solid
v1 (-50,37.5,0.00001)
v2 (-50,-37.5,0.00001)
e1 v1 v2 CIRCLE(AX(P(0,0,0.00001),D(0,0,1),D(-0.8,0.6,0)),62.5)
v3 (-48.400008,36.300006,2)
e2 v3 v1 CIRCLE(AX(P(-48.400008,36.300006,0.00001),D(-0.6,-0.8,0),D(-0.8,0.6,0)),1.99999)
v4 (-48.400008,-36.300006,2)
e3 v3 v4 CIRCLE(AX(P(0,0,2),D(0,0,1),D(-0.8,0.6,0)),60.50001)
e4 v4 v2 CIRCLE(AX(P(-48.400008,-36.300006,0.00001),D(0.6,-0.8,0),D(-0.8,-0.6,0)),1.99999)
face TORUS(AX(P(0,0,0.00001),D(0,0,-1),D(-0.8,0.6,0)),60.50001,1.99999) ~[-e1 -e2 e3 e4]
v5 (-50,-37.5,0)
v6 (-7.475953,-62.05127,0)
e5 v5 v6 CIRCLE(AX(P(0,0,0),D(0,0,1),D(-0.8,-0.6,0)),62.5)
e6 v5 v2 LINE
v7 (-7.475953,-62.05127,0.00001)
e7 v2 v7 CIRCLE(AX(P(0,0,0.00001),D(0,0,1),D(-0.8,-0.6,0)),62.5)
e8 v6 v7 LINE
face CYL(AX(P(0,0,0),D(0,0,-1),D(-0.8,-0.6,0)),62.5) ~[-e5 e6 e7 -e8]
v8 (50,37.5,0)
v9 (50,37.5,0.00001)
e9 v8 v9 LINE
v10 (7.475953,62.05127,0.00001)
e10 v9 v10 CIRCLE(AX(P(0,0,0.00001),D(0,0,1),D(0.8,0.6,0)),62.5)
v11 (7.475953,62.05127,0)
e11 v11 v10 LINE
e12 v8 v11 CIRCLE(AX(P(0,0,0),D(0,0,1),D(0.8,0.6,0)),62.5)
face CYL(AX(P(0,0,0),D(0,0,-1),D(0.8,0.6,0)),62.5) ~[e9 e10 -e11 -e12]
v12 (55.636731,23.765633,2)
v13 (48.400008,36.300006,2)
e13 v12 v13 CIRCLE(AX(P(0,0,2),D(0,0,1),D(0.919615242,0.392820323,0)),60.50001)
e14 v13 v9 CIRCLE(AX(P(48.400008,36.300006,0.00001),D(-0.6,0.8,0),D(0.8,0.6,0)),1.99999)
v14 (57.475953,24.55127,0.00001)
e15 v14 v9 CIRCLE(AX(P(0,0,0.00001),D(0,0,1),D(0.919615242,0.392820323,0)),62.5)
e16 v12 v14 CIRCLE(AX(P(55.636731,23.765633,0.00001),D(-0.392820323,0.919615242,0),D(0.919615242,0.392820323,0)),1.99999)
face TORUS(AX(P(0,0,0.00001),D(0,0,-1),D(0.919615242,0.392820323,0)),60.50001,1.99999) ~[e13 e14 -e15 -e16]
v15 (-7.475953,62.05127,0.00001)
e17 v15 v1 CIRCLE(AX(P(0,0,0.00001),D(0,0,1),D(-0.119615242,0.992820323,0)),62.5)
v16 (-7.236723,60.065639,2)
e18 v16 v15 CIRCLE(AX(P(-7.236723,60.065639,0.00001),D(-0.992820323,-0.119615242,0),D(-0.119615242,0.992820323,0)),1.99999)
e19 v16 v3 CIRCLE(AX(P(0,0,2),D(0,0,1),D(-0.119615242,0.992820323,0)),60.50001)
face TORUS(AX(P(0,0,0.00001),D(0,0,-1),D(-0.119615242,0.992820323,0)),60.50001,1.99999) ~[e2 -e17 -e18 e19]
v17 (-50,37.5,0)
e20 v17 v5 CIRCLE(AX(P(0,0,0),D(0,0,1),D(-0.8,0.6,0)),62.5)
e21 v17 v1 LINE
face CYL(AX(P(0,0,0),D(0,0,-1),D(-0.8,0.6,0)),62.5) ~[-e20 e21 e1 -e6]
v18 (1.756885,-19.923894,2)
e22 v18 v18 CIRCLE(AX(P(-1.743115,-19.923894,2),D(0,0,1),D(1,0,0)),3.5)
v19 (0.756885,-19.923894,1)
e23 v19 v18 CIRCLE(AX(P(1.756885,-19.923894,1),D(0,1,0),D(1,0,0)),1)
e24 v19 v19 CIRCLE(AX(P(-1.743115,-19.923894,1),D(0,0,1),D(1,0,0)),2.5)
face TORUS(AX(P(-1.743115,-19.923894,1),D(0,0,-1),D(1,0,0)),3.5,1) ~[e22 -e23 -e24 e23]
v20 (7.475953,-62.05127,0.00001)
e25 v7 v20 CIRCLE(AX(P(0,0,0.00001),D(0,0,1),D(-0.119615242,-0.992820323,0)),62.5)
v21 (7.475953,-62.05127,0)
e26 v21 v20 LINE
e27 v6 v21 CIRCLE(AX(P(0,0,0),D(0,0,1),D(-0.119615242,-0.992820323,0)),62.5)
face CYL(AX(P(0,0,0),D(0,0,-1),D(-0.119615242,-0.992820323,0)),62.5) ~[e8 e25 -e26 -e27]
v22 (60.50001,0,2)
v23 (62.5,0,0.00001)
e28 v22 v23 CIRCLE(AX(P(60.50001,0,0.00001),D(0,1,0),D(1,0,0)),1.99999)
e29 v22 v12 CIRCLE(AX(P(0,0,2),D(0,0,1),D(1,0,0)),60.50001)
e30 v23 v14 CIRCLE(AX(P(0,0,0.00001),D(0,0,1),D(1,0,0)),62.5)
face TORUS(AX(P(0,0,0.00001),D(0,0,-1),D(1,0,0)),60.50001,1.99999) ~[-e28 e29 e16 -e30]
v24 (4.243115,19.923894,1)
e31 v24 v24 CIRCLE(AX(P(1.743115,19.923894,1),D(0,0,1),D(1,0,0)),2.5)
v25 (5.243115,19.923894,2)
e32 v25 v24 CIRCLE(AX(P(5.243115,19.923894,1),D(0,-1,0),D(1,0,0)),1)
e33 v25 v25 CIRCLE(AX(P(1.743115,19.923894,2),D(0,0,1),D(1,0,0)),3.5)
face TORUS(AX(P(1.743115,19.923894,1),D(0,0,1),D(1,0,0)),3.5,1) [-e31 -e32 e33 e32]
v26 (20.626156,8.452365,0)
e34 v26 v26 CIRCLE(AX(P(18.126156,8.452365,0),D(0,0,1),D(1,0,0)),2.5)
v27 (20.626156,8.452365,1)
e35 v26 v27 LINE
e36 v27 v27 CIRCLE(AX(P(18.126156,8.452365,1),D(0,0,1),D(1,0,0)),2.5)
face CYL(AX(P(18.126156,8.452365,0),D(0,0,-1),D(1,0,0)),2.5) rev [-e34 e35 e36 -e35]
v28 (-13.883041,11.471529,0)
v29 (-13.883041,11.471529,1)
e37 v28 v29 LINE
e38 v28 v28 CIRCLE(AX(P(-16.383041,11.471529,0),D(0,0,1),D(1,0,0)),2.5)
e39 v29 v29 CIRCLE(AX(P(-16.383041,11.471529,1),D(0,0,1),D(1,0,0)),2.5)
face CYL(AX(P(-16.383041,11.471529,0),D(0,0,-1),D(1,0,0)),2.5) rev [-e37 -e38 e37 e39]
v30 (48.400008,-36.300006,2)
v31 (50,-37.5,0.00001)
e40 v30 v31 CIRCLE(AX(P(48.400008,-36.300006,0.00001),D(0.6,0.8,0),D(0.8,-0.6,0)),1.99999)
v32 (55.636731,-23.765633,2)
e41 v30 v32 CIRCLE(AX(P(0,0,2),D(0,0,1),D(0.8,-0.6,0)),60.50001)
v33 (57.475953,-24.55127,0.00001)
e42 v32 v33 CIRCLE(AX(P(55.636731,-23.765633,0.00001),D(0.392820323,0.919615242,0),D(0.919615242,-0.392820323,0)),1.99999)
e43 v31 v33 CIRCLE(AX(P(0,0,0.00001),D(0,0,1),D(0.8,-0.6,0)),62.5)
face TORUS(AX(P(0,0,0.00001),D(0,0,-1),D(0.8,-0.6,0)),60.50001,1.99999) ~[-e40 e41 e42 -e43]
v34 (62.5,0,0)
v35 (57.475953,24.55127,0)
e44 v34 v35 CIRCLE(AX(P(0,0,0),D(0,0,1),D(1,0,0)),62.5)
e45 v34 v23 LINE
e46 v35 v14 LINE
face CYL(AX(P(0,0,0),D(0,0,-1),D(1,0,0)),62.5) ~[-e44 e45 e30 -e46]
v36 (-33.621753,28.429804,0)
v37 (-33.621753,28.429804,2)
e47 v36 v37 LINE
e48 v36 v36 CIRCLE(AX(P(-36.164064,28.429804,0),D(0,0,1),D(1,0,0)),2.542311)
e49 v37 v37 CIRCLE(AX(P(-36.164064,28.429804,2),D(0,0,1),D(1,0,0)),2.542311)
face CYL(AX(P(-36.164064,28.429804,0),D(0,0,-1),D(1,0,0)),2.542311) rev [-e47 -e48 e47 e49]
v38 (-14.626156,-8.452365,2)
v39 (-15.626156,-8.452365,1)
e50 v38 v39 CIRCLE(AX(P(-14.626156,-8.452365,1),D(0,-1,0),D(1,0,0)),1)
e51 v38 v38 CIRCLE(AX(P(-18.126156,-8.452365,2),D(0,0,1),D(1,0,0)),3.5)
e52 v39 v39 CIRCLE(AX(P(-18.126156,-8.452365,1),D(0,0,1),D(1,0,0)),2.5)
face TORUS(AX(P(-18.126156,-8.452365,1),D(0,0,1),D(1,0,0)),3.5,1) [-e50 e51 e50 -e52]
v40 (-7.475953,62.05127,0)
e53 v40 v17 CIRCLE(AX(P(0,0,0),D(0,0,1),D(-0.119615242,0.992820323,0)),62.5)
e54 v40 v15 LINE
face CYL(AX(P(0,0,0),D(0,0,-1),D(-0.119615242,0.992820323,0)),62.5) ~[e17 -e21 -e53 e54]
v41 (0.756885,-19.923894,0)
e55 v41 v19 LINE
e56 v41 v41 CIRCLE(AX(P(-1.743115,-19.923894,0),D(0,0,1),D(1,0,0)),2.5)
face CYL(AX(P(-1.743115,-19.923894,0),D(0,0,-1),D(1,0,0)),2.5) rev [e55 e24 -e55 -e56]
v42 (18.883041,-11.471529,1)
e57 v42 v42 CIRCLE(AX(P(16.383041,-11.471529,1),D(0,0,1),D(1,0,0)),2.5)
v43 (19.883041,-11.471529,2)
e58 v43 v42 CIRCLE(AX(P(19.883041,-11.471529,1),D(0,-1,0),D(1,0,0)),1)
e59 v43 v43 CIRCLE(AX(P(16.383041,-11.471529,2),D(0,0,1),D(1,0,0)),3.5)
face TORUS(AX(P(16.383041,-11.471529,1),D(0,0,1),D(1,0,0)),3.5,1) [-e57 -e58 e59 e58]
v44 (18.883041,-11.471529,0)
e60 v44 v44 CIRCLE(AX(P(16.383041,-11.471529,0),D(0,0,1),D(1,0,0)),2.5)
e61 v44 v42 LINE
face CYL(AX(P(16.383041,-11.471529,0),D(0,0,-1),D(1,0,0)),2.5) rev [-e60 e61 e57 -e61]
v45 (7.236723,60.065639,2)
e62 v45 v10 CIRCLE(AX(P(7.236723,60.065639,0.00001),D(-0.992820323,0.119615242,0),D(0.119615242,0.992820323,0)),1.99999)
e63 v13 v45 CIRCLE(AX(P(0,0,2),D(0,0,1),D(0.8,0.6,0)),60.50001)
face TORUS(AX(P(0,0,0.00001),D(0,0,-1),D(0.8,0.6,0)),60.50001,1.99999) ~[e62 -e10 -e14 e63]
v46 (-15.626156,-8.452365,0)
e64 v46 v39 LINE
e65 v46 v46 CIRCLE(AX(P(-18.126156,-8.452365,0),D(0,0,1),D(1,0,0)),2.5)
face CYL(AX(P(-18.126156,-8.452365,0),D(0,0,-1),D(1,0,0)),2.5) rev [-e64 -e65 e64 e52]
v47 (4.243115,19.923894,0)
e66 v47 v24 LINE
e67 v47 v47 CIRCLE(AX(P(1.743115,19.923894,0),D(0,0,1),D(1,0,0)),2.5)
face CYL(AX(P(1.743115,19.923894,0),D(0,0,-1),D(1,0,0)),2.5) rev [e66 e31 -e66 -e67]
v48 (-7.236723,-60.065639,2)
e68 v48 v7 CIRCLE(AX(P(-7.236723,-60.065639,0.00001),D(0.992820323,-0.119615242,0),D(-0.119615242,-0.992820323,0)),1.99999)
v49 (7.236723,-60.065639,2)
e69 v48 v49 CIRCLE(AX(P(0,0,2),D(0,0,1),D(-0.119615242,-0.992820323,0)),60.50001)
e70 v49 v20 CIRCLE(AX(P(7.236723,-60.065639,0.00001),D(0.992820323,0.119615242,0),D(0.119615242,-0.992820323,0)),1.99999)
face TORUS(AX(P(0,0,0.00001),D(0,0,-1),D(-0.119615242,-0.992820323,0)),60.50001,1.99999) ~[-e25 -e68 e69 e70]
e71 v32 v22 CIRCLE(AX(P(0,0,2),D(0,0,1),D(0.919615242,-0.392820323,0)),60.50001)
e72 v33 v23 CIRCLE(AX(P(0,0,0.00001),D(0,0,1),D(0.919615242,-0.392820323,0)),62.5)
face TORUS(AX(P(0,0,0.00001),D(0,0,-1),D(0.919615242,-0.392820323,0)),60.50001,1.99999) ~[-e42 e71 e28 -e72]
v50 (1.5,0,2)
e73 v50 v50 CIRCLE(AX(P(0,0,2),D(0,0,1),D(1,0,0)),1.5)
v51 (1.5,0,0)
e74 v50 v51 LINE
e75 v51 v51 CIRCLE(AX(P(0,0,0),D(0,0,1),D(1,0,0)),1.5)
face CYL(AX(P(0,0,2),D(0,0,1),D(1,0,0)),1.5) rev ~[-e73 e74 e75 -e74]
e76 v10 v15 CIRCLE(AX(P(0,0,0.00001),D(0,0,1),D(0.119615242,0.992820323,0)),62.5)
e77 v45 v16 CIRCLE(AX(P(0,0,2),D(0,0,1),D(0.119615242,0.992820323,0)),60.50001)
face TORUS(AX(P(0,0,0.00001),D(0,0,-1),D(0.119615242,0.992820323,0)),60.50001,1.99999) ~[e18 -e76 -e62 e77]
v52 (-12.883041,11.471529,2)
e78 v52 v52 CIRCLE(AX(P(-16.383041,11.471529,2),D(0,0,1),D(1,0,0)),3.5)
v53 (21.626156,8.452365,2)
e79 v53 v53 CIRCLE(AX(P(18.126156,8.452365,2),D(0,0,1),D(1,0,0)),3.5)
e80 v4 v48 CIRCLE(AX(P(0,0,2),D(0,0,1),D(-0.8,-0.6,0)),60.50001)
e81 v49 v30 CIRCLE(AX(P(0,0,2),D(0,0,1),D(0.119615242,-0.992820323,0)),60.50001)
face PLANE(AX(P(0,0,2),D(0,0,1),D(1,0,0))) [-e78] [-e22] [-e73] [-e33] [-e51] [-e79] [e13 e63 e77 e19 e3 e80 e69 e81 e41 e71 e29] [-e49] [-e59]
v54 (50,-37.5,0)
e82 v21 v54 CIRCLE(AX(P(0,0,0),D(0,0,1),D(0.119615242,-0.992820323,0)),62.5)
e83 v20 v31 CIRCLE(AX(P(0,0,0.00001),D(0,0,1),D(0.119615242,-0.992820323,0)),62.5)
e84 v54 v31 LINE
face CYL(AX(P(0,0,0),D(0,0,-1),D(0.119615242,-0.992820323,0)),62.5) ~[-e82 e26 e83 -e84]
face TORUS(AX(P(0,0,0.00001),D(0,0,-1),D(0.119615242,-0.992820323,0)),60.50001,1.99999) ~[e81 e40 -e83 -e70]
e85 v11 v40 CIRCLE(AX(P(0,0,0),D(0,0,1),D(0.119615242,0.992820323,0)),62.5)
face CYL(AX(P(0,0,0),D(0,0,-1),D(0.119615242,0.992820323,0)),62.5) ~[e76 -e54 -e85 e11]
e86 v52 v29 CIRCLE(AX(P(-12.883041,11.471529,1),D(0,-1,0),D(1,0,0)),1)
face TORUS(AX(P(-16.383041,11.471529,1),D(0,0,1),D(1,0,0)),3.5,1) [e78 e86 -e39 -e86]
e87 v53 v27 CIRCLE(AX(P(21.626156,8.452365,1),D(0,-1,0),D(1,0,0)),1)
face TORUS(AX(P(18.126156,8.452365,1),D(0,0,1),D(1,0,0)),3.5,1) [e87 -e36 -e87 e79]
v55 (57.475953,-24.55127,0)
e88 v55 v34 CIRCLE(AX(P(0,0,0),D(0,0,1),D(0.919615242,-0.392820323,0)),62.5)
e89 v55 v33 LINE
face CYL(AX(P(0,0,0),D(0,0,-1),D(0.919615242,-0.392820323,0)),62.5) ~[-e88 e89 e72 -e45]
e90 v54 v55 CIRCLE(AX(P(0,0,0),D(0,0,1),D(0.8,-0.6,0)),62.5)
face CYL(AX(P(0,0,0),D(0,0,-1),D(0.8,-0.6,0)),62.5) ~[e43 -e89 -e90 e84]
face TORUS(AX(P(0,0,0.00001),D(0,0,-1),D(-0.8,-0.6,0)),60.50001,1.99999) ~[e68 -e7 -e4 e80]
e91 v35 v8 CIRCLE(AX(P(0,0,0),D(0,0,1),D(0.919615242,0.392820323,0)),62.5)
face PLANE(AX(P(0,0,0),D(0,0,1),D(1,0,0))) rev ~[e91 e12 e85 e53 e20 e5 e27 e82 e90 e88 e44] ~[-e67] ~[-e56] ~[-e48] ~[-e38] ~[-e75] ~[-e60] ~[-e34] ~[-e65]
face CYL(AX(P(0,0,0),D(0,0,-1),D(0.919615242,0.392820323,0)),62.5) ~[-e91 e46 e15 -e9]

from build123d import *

# Parameters (mm, degrees)
F0_R     = 2.5
F0_R_2   = 2.5423106838
F1_DEPTH = 2
F2_R     = 1
F3_R     = 1
F4_R     = 1.99999
F5_R     = 1.5
F6_DEPTH = 2


# Not quite as in the source:
# - a fillet or chamfer is up to 0.001 mm smaller than in the source, because OpenCascade refuses the exact size


with BuildPart() as f1:
    # F0 (on Top) → F1 (new body)
    with BuildSketch(Plane.XY):
        Polygon((-35.0480947162, -37.5), (35.0480947162, -37.5), (50, -28.8675134595), (50, 28.8675134595), (35.0480947162, 37.5), (-35.0480947162, 37.5), (-50, 28.8675134595), (-50, -28.8675134595), align=None)
        with Locations((-1.743114855, -19.9238939618)):
            Circle(F0_R, mode=Mode.SUBTRACT)
        with Locations((-18.1261557407, -8.4523652348)):
            Circle(F0_R, mode=Mode.SUBTRACT)
        with Locations((16.3830408858, -11.471528727)):
            Circle(F0_R, mode=Mode.SUBTRACT)
        with Locations((-36.1640639603, 28.4298043698)):
            Circle(F0_R_2, mode=Mode.SUBTRACT)
        with Locations((-16.3830408858, 11.471528727)):
            Circle(F0_R, mode=Mode.SUBTRACT)
        with Locations((18.1261557407, 8.4523652348)):
            Circle(F0_R, mode=Mode.SUBTRACT)
        with Locations((1.743114855, 19.9238939618)):
            Circle(F0_R, mode=Mode.SUBTRACT)
        Polygon((-50, -37.5), (-35.0480947162, -37.5), (-50, -28.8675134595), align=None)
        Polygon((-50, 37.5), (-50, 28.8675134595), (-35.0480947162, 37.5), align=None)
        Polygon((35.0480947162, 37.5), (50, 28.8675134595), (50, 37.5), align=None)
        Polygon((35.0480947162, -37.5), (50, -37.5), (50, -28.8675134595), align=None)
        Polygon((-35.0480947162, 37.5), (35.0480947162, 37.5), (0, 57.735026919), align=None)
        with BuildLine():
            Line((50, 28.8675134595), (50, -28.8675134595))
            Line((50, -28.8675134595), (57.4759526419, -24.5512701892))
            ThreePointArc((57.4759526419, -24.5512701892), (61.2311074541, -12.530023142), (62.5, 0))
            ThreePointArc((62.5, 0), (61.2311074541, 12.530023142), (57.4759526419, 24.5512701892))
            Line((57.4759526419, 24.5512701892), (50, 28.8675134595))
        make_face()
        with BuildLine():
            Line((35.0480947162, 37.5), (50, 37.5))
            ThreePointArc((50, 37.5), (31.25, 54.1265877365), (7.4759526419, 62.0512701892))
            Line((7.4759526419, 62.0512701892), (0, 57.735026919))
            Line((0, 57.735026919), (35.0480947162, 37.5))
        make_face()
        with BuildLine():
            Line((0, 57.735026919), (7.4759526419, 62.0512701892))
            ThreePointArc((7.4759526419, 62.0512701892), (0, 62.5), (-7.4759526419, 62.0512701892))
            Line((-7.4759526419, 62.0512701892), (0, 57.735026919))
        make_face()
        with BuildLine():
            Line((50, -28.8675134595), (50, -37.5))
            ThreePointArc((50, -37.5), (54.1265877365, -31.25), (57.4759526419, -24.5512701892))
            Line((57.4759526419, -24.5512701892), (50, -28.8675134595))
        make_face()
        with BuildLine():
            ThreePointArc((7.4759526419, -62.0512701892), (31.25, -54.1265877365), (50, -37.5))
            Line((50, -37.5), (35.0480947162, -37.5))
            Line((35.0480947162, -37.5), (0, -57.735026919))
            Line((0, -57.735026919), (7.4759526419, -62.0512701892))
        make_face()
        Polygon((0, -57.735026919), (35.0480947162, -37.5), (-35.0480947162, -37.5), align=None)
        with BuildLine():
            Line((0, -57.735026919), (-35.0480947162, -37.5))
            Line((-35.0480947162, -37.5), (-50, -37.5))
            ThreePointArc((-50, -37.5), (-31.25, -54.1265877365), (-7.4759526419, -62.0512701892))
            Line((-7.4759526419, -62.0512701892), (0, -57.735026919))
        make_face()
        with BuildLine():
            ThreePointArc((-57.4759526419, -24.5512701892), (-54.1265877365, -31.25), (-50, -37.5))
            Line((-50, -37.5), (-50, -28.8675134595))
            Line((-50, -28.8675134595), (-57.4759526419, -24.5512701892))
        make_face()
        with BuildLine():
            Line((-57.4759526419, -24.5512701892), (-50, -28.8675134595))
            Line((-50, -28.8675134595), (-50, 28.8675134595))
            Line((-50, 28.8675134595), (-57.4759526419, 24.5512701892))
            ThreePointArc((-57.4759526419, 24.5512701892), (-62.5, 0), (-57.4759526419, -24.5512701892))
        make_face()
        with BuildLine():
            ThreePointArc((-7.4759526419, -62.0512701892), (0, -62.5), (7.4759526419, -62.0512701892))
            Line((7.4759526419, -62.0512701892), (0, -57.735026919))
            Line((0, -57.735026919), (-7.4759526419, -62.0512701892))
        make_face()
        with BuildLine():
            Line((-57.4759526419, 24.5512701892), (-50, 28.8675134595))
            Line((-50, 28.8675134595), (-50, 37.5))
            ThreePointArc((-50, 37.5), (-54.1265877365, 31.25), (-57.4759526419, 24.5512701892))
        make_face()
        with BuildLine():
            Line((-50, 37.5), (-35.0480947162, 37.5))
            Line((-35.0480947162, 37.5), (0, 57.735026919))
            Line((0, 57.735026919), (-7.4759526419, 62.0512701892))
            ThreePointArc((-7.4759526419, 62.0512701892), (-31.25, 54.1265877365), (-50, 37.5))
        make_face()
        with BuildLine():
            Line((50, 37.5), (50, 28.8675134595))
            Line((50, 28.8675134595), (57.4759526419, 24.5512701892))
            ThreePointArc((57.4759526419, 24.5512701892), (54.1265877365, 31.25), (50, 37.5))
        make_face()
    extrude(amount=F1_DEPTH)

    # F2
    f2_edges = [f1.edges().sort_by_distance(p)[0] for p in [
        (-4.243115, -19.923894, 2),
    ]]
    fillet(f2_edges, radius=F2_R)

    # F3
    f3_edges = [f1.edges().sort_by_distance(p)[0] for p in [
        (-20.626156, -8.452365, 2),
        (-18.883041, 11.471529, 2),
        (-0.756885, 19.923894, 2),
        (15.626156, 8.452365, 2),
        (13.883041, -11.471529, 2),
    ]]
    fillet(f3_edges, radius=F3_R)

    # F4 (radius 2 in the source; OpenCascade refuses exactly that, so slightly less here)
    f4_edges = [f1.edges().sort_by_distance(p)[0] for p in [
        (-57.475953, -24.55127, 2),
    ]]
    fillet(f4_edges, radius=F4_R)

    # F5 (on face) → F6 (cut)
    with BuildSketch(Plane.XY.offset(2)):
        Circle(F5_R)
    extrude(amount=-F6_DEPTH, mode=Mode.SUBTRACT)


solid = f1.part
